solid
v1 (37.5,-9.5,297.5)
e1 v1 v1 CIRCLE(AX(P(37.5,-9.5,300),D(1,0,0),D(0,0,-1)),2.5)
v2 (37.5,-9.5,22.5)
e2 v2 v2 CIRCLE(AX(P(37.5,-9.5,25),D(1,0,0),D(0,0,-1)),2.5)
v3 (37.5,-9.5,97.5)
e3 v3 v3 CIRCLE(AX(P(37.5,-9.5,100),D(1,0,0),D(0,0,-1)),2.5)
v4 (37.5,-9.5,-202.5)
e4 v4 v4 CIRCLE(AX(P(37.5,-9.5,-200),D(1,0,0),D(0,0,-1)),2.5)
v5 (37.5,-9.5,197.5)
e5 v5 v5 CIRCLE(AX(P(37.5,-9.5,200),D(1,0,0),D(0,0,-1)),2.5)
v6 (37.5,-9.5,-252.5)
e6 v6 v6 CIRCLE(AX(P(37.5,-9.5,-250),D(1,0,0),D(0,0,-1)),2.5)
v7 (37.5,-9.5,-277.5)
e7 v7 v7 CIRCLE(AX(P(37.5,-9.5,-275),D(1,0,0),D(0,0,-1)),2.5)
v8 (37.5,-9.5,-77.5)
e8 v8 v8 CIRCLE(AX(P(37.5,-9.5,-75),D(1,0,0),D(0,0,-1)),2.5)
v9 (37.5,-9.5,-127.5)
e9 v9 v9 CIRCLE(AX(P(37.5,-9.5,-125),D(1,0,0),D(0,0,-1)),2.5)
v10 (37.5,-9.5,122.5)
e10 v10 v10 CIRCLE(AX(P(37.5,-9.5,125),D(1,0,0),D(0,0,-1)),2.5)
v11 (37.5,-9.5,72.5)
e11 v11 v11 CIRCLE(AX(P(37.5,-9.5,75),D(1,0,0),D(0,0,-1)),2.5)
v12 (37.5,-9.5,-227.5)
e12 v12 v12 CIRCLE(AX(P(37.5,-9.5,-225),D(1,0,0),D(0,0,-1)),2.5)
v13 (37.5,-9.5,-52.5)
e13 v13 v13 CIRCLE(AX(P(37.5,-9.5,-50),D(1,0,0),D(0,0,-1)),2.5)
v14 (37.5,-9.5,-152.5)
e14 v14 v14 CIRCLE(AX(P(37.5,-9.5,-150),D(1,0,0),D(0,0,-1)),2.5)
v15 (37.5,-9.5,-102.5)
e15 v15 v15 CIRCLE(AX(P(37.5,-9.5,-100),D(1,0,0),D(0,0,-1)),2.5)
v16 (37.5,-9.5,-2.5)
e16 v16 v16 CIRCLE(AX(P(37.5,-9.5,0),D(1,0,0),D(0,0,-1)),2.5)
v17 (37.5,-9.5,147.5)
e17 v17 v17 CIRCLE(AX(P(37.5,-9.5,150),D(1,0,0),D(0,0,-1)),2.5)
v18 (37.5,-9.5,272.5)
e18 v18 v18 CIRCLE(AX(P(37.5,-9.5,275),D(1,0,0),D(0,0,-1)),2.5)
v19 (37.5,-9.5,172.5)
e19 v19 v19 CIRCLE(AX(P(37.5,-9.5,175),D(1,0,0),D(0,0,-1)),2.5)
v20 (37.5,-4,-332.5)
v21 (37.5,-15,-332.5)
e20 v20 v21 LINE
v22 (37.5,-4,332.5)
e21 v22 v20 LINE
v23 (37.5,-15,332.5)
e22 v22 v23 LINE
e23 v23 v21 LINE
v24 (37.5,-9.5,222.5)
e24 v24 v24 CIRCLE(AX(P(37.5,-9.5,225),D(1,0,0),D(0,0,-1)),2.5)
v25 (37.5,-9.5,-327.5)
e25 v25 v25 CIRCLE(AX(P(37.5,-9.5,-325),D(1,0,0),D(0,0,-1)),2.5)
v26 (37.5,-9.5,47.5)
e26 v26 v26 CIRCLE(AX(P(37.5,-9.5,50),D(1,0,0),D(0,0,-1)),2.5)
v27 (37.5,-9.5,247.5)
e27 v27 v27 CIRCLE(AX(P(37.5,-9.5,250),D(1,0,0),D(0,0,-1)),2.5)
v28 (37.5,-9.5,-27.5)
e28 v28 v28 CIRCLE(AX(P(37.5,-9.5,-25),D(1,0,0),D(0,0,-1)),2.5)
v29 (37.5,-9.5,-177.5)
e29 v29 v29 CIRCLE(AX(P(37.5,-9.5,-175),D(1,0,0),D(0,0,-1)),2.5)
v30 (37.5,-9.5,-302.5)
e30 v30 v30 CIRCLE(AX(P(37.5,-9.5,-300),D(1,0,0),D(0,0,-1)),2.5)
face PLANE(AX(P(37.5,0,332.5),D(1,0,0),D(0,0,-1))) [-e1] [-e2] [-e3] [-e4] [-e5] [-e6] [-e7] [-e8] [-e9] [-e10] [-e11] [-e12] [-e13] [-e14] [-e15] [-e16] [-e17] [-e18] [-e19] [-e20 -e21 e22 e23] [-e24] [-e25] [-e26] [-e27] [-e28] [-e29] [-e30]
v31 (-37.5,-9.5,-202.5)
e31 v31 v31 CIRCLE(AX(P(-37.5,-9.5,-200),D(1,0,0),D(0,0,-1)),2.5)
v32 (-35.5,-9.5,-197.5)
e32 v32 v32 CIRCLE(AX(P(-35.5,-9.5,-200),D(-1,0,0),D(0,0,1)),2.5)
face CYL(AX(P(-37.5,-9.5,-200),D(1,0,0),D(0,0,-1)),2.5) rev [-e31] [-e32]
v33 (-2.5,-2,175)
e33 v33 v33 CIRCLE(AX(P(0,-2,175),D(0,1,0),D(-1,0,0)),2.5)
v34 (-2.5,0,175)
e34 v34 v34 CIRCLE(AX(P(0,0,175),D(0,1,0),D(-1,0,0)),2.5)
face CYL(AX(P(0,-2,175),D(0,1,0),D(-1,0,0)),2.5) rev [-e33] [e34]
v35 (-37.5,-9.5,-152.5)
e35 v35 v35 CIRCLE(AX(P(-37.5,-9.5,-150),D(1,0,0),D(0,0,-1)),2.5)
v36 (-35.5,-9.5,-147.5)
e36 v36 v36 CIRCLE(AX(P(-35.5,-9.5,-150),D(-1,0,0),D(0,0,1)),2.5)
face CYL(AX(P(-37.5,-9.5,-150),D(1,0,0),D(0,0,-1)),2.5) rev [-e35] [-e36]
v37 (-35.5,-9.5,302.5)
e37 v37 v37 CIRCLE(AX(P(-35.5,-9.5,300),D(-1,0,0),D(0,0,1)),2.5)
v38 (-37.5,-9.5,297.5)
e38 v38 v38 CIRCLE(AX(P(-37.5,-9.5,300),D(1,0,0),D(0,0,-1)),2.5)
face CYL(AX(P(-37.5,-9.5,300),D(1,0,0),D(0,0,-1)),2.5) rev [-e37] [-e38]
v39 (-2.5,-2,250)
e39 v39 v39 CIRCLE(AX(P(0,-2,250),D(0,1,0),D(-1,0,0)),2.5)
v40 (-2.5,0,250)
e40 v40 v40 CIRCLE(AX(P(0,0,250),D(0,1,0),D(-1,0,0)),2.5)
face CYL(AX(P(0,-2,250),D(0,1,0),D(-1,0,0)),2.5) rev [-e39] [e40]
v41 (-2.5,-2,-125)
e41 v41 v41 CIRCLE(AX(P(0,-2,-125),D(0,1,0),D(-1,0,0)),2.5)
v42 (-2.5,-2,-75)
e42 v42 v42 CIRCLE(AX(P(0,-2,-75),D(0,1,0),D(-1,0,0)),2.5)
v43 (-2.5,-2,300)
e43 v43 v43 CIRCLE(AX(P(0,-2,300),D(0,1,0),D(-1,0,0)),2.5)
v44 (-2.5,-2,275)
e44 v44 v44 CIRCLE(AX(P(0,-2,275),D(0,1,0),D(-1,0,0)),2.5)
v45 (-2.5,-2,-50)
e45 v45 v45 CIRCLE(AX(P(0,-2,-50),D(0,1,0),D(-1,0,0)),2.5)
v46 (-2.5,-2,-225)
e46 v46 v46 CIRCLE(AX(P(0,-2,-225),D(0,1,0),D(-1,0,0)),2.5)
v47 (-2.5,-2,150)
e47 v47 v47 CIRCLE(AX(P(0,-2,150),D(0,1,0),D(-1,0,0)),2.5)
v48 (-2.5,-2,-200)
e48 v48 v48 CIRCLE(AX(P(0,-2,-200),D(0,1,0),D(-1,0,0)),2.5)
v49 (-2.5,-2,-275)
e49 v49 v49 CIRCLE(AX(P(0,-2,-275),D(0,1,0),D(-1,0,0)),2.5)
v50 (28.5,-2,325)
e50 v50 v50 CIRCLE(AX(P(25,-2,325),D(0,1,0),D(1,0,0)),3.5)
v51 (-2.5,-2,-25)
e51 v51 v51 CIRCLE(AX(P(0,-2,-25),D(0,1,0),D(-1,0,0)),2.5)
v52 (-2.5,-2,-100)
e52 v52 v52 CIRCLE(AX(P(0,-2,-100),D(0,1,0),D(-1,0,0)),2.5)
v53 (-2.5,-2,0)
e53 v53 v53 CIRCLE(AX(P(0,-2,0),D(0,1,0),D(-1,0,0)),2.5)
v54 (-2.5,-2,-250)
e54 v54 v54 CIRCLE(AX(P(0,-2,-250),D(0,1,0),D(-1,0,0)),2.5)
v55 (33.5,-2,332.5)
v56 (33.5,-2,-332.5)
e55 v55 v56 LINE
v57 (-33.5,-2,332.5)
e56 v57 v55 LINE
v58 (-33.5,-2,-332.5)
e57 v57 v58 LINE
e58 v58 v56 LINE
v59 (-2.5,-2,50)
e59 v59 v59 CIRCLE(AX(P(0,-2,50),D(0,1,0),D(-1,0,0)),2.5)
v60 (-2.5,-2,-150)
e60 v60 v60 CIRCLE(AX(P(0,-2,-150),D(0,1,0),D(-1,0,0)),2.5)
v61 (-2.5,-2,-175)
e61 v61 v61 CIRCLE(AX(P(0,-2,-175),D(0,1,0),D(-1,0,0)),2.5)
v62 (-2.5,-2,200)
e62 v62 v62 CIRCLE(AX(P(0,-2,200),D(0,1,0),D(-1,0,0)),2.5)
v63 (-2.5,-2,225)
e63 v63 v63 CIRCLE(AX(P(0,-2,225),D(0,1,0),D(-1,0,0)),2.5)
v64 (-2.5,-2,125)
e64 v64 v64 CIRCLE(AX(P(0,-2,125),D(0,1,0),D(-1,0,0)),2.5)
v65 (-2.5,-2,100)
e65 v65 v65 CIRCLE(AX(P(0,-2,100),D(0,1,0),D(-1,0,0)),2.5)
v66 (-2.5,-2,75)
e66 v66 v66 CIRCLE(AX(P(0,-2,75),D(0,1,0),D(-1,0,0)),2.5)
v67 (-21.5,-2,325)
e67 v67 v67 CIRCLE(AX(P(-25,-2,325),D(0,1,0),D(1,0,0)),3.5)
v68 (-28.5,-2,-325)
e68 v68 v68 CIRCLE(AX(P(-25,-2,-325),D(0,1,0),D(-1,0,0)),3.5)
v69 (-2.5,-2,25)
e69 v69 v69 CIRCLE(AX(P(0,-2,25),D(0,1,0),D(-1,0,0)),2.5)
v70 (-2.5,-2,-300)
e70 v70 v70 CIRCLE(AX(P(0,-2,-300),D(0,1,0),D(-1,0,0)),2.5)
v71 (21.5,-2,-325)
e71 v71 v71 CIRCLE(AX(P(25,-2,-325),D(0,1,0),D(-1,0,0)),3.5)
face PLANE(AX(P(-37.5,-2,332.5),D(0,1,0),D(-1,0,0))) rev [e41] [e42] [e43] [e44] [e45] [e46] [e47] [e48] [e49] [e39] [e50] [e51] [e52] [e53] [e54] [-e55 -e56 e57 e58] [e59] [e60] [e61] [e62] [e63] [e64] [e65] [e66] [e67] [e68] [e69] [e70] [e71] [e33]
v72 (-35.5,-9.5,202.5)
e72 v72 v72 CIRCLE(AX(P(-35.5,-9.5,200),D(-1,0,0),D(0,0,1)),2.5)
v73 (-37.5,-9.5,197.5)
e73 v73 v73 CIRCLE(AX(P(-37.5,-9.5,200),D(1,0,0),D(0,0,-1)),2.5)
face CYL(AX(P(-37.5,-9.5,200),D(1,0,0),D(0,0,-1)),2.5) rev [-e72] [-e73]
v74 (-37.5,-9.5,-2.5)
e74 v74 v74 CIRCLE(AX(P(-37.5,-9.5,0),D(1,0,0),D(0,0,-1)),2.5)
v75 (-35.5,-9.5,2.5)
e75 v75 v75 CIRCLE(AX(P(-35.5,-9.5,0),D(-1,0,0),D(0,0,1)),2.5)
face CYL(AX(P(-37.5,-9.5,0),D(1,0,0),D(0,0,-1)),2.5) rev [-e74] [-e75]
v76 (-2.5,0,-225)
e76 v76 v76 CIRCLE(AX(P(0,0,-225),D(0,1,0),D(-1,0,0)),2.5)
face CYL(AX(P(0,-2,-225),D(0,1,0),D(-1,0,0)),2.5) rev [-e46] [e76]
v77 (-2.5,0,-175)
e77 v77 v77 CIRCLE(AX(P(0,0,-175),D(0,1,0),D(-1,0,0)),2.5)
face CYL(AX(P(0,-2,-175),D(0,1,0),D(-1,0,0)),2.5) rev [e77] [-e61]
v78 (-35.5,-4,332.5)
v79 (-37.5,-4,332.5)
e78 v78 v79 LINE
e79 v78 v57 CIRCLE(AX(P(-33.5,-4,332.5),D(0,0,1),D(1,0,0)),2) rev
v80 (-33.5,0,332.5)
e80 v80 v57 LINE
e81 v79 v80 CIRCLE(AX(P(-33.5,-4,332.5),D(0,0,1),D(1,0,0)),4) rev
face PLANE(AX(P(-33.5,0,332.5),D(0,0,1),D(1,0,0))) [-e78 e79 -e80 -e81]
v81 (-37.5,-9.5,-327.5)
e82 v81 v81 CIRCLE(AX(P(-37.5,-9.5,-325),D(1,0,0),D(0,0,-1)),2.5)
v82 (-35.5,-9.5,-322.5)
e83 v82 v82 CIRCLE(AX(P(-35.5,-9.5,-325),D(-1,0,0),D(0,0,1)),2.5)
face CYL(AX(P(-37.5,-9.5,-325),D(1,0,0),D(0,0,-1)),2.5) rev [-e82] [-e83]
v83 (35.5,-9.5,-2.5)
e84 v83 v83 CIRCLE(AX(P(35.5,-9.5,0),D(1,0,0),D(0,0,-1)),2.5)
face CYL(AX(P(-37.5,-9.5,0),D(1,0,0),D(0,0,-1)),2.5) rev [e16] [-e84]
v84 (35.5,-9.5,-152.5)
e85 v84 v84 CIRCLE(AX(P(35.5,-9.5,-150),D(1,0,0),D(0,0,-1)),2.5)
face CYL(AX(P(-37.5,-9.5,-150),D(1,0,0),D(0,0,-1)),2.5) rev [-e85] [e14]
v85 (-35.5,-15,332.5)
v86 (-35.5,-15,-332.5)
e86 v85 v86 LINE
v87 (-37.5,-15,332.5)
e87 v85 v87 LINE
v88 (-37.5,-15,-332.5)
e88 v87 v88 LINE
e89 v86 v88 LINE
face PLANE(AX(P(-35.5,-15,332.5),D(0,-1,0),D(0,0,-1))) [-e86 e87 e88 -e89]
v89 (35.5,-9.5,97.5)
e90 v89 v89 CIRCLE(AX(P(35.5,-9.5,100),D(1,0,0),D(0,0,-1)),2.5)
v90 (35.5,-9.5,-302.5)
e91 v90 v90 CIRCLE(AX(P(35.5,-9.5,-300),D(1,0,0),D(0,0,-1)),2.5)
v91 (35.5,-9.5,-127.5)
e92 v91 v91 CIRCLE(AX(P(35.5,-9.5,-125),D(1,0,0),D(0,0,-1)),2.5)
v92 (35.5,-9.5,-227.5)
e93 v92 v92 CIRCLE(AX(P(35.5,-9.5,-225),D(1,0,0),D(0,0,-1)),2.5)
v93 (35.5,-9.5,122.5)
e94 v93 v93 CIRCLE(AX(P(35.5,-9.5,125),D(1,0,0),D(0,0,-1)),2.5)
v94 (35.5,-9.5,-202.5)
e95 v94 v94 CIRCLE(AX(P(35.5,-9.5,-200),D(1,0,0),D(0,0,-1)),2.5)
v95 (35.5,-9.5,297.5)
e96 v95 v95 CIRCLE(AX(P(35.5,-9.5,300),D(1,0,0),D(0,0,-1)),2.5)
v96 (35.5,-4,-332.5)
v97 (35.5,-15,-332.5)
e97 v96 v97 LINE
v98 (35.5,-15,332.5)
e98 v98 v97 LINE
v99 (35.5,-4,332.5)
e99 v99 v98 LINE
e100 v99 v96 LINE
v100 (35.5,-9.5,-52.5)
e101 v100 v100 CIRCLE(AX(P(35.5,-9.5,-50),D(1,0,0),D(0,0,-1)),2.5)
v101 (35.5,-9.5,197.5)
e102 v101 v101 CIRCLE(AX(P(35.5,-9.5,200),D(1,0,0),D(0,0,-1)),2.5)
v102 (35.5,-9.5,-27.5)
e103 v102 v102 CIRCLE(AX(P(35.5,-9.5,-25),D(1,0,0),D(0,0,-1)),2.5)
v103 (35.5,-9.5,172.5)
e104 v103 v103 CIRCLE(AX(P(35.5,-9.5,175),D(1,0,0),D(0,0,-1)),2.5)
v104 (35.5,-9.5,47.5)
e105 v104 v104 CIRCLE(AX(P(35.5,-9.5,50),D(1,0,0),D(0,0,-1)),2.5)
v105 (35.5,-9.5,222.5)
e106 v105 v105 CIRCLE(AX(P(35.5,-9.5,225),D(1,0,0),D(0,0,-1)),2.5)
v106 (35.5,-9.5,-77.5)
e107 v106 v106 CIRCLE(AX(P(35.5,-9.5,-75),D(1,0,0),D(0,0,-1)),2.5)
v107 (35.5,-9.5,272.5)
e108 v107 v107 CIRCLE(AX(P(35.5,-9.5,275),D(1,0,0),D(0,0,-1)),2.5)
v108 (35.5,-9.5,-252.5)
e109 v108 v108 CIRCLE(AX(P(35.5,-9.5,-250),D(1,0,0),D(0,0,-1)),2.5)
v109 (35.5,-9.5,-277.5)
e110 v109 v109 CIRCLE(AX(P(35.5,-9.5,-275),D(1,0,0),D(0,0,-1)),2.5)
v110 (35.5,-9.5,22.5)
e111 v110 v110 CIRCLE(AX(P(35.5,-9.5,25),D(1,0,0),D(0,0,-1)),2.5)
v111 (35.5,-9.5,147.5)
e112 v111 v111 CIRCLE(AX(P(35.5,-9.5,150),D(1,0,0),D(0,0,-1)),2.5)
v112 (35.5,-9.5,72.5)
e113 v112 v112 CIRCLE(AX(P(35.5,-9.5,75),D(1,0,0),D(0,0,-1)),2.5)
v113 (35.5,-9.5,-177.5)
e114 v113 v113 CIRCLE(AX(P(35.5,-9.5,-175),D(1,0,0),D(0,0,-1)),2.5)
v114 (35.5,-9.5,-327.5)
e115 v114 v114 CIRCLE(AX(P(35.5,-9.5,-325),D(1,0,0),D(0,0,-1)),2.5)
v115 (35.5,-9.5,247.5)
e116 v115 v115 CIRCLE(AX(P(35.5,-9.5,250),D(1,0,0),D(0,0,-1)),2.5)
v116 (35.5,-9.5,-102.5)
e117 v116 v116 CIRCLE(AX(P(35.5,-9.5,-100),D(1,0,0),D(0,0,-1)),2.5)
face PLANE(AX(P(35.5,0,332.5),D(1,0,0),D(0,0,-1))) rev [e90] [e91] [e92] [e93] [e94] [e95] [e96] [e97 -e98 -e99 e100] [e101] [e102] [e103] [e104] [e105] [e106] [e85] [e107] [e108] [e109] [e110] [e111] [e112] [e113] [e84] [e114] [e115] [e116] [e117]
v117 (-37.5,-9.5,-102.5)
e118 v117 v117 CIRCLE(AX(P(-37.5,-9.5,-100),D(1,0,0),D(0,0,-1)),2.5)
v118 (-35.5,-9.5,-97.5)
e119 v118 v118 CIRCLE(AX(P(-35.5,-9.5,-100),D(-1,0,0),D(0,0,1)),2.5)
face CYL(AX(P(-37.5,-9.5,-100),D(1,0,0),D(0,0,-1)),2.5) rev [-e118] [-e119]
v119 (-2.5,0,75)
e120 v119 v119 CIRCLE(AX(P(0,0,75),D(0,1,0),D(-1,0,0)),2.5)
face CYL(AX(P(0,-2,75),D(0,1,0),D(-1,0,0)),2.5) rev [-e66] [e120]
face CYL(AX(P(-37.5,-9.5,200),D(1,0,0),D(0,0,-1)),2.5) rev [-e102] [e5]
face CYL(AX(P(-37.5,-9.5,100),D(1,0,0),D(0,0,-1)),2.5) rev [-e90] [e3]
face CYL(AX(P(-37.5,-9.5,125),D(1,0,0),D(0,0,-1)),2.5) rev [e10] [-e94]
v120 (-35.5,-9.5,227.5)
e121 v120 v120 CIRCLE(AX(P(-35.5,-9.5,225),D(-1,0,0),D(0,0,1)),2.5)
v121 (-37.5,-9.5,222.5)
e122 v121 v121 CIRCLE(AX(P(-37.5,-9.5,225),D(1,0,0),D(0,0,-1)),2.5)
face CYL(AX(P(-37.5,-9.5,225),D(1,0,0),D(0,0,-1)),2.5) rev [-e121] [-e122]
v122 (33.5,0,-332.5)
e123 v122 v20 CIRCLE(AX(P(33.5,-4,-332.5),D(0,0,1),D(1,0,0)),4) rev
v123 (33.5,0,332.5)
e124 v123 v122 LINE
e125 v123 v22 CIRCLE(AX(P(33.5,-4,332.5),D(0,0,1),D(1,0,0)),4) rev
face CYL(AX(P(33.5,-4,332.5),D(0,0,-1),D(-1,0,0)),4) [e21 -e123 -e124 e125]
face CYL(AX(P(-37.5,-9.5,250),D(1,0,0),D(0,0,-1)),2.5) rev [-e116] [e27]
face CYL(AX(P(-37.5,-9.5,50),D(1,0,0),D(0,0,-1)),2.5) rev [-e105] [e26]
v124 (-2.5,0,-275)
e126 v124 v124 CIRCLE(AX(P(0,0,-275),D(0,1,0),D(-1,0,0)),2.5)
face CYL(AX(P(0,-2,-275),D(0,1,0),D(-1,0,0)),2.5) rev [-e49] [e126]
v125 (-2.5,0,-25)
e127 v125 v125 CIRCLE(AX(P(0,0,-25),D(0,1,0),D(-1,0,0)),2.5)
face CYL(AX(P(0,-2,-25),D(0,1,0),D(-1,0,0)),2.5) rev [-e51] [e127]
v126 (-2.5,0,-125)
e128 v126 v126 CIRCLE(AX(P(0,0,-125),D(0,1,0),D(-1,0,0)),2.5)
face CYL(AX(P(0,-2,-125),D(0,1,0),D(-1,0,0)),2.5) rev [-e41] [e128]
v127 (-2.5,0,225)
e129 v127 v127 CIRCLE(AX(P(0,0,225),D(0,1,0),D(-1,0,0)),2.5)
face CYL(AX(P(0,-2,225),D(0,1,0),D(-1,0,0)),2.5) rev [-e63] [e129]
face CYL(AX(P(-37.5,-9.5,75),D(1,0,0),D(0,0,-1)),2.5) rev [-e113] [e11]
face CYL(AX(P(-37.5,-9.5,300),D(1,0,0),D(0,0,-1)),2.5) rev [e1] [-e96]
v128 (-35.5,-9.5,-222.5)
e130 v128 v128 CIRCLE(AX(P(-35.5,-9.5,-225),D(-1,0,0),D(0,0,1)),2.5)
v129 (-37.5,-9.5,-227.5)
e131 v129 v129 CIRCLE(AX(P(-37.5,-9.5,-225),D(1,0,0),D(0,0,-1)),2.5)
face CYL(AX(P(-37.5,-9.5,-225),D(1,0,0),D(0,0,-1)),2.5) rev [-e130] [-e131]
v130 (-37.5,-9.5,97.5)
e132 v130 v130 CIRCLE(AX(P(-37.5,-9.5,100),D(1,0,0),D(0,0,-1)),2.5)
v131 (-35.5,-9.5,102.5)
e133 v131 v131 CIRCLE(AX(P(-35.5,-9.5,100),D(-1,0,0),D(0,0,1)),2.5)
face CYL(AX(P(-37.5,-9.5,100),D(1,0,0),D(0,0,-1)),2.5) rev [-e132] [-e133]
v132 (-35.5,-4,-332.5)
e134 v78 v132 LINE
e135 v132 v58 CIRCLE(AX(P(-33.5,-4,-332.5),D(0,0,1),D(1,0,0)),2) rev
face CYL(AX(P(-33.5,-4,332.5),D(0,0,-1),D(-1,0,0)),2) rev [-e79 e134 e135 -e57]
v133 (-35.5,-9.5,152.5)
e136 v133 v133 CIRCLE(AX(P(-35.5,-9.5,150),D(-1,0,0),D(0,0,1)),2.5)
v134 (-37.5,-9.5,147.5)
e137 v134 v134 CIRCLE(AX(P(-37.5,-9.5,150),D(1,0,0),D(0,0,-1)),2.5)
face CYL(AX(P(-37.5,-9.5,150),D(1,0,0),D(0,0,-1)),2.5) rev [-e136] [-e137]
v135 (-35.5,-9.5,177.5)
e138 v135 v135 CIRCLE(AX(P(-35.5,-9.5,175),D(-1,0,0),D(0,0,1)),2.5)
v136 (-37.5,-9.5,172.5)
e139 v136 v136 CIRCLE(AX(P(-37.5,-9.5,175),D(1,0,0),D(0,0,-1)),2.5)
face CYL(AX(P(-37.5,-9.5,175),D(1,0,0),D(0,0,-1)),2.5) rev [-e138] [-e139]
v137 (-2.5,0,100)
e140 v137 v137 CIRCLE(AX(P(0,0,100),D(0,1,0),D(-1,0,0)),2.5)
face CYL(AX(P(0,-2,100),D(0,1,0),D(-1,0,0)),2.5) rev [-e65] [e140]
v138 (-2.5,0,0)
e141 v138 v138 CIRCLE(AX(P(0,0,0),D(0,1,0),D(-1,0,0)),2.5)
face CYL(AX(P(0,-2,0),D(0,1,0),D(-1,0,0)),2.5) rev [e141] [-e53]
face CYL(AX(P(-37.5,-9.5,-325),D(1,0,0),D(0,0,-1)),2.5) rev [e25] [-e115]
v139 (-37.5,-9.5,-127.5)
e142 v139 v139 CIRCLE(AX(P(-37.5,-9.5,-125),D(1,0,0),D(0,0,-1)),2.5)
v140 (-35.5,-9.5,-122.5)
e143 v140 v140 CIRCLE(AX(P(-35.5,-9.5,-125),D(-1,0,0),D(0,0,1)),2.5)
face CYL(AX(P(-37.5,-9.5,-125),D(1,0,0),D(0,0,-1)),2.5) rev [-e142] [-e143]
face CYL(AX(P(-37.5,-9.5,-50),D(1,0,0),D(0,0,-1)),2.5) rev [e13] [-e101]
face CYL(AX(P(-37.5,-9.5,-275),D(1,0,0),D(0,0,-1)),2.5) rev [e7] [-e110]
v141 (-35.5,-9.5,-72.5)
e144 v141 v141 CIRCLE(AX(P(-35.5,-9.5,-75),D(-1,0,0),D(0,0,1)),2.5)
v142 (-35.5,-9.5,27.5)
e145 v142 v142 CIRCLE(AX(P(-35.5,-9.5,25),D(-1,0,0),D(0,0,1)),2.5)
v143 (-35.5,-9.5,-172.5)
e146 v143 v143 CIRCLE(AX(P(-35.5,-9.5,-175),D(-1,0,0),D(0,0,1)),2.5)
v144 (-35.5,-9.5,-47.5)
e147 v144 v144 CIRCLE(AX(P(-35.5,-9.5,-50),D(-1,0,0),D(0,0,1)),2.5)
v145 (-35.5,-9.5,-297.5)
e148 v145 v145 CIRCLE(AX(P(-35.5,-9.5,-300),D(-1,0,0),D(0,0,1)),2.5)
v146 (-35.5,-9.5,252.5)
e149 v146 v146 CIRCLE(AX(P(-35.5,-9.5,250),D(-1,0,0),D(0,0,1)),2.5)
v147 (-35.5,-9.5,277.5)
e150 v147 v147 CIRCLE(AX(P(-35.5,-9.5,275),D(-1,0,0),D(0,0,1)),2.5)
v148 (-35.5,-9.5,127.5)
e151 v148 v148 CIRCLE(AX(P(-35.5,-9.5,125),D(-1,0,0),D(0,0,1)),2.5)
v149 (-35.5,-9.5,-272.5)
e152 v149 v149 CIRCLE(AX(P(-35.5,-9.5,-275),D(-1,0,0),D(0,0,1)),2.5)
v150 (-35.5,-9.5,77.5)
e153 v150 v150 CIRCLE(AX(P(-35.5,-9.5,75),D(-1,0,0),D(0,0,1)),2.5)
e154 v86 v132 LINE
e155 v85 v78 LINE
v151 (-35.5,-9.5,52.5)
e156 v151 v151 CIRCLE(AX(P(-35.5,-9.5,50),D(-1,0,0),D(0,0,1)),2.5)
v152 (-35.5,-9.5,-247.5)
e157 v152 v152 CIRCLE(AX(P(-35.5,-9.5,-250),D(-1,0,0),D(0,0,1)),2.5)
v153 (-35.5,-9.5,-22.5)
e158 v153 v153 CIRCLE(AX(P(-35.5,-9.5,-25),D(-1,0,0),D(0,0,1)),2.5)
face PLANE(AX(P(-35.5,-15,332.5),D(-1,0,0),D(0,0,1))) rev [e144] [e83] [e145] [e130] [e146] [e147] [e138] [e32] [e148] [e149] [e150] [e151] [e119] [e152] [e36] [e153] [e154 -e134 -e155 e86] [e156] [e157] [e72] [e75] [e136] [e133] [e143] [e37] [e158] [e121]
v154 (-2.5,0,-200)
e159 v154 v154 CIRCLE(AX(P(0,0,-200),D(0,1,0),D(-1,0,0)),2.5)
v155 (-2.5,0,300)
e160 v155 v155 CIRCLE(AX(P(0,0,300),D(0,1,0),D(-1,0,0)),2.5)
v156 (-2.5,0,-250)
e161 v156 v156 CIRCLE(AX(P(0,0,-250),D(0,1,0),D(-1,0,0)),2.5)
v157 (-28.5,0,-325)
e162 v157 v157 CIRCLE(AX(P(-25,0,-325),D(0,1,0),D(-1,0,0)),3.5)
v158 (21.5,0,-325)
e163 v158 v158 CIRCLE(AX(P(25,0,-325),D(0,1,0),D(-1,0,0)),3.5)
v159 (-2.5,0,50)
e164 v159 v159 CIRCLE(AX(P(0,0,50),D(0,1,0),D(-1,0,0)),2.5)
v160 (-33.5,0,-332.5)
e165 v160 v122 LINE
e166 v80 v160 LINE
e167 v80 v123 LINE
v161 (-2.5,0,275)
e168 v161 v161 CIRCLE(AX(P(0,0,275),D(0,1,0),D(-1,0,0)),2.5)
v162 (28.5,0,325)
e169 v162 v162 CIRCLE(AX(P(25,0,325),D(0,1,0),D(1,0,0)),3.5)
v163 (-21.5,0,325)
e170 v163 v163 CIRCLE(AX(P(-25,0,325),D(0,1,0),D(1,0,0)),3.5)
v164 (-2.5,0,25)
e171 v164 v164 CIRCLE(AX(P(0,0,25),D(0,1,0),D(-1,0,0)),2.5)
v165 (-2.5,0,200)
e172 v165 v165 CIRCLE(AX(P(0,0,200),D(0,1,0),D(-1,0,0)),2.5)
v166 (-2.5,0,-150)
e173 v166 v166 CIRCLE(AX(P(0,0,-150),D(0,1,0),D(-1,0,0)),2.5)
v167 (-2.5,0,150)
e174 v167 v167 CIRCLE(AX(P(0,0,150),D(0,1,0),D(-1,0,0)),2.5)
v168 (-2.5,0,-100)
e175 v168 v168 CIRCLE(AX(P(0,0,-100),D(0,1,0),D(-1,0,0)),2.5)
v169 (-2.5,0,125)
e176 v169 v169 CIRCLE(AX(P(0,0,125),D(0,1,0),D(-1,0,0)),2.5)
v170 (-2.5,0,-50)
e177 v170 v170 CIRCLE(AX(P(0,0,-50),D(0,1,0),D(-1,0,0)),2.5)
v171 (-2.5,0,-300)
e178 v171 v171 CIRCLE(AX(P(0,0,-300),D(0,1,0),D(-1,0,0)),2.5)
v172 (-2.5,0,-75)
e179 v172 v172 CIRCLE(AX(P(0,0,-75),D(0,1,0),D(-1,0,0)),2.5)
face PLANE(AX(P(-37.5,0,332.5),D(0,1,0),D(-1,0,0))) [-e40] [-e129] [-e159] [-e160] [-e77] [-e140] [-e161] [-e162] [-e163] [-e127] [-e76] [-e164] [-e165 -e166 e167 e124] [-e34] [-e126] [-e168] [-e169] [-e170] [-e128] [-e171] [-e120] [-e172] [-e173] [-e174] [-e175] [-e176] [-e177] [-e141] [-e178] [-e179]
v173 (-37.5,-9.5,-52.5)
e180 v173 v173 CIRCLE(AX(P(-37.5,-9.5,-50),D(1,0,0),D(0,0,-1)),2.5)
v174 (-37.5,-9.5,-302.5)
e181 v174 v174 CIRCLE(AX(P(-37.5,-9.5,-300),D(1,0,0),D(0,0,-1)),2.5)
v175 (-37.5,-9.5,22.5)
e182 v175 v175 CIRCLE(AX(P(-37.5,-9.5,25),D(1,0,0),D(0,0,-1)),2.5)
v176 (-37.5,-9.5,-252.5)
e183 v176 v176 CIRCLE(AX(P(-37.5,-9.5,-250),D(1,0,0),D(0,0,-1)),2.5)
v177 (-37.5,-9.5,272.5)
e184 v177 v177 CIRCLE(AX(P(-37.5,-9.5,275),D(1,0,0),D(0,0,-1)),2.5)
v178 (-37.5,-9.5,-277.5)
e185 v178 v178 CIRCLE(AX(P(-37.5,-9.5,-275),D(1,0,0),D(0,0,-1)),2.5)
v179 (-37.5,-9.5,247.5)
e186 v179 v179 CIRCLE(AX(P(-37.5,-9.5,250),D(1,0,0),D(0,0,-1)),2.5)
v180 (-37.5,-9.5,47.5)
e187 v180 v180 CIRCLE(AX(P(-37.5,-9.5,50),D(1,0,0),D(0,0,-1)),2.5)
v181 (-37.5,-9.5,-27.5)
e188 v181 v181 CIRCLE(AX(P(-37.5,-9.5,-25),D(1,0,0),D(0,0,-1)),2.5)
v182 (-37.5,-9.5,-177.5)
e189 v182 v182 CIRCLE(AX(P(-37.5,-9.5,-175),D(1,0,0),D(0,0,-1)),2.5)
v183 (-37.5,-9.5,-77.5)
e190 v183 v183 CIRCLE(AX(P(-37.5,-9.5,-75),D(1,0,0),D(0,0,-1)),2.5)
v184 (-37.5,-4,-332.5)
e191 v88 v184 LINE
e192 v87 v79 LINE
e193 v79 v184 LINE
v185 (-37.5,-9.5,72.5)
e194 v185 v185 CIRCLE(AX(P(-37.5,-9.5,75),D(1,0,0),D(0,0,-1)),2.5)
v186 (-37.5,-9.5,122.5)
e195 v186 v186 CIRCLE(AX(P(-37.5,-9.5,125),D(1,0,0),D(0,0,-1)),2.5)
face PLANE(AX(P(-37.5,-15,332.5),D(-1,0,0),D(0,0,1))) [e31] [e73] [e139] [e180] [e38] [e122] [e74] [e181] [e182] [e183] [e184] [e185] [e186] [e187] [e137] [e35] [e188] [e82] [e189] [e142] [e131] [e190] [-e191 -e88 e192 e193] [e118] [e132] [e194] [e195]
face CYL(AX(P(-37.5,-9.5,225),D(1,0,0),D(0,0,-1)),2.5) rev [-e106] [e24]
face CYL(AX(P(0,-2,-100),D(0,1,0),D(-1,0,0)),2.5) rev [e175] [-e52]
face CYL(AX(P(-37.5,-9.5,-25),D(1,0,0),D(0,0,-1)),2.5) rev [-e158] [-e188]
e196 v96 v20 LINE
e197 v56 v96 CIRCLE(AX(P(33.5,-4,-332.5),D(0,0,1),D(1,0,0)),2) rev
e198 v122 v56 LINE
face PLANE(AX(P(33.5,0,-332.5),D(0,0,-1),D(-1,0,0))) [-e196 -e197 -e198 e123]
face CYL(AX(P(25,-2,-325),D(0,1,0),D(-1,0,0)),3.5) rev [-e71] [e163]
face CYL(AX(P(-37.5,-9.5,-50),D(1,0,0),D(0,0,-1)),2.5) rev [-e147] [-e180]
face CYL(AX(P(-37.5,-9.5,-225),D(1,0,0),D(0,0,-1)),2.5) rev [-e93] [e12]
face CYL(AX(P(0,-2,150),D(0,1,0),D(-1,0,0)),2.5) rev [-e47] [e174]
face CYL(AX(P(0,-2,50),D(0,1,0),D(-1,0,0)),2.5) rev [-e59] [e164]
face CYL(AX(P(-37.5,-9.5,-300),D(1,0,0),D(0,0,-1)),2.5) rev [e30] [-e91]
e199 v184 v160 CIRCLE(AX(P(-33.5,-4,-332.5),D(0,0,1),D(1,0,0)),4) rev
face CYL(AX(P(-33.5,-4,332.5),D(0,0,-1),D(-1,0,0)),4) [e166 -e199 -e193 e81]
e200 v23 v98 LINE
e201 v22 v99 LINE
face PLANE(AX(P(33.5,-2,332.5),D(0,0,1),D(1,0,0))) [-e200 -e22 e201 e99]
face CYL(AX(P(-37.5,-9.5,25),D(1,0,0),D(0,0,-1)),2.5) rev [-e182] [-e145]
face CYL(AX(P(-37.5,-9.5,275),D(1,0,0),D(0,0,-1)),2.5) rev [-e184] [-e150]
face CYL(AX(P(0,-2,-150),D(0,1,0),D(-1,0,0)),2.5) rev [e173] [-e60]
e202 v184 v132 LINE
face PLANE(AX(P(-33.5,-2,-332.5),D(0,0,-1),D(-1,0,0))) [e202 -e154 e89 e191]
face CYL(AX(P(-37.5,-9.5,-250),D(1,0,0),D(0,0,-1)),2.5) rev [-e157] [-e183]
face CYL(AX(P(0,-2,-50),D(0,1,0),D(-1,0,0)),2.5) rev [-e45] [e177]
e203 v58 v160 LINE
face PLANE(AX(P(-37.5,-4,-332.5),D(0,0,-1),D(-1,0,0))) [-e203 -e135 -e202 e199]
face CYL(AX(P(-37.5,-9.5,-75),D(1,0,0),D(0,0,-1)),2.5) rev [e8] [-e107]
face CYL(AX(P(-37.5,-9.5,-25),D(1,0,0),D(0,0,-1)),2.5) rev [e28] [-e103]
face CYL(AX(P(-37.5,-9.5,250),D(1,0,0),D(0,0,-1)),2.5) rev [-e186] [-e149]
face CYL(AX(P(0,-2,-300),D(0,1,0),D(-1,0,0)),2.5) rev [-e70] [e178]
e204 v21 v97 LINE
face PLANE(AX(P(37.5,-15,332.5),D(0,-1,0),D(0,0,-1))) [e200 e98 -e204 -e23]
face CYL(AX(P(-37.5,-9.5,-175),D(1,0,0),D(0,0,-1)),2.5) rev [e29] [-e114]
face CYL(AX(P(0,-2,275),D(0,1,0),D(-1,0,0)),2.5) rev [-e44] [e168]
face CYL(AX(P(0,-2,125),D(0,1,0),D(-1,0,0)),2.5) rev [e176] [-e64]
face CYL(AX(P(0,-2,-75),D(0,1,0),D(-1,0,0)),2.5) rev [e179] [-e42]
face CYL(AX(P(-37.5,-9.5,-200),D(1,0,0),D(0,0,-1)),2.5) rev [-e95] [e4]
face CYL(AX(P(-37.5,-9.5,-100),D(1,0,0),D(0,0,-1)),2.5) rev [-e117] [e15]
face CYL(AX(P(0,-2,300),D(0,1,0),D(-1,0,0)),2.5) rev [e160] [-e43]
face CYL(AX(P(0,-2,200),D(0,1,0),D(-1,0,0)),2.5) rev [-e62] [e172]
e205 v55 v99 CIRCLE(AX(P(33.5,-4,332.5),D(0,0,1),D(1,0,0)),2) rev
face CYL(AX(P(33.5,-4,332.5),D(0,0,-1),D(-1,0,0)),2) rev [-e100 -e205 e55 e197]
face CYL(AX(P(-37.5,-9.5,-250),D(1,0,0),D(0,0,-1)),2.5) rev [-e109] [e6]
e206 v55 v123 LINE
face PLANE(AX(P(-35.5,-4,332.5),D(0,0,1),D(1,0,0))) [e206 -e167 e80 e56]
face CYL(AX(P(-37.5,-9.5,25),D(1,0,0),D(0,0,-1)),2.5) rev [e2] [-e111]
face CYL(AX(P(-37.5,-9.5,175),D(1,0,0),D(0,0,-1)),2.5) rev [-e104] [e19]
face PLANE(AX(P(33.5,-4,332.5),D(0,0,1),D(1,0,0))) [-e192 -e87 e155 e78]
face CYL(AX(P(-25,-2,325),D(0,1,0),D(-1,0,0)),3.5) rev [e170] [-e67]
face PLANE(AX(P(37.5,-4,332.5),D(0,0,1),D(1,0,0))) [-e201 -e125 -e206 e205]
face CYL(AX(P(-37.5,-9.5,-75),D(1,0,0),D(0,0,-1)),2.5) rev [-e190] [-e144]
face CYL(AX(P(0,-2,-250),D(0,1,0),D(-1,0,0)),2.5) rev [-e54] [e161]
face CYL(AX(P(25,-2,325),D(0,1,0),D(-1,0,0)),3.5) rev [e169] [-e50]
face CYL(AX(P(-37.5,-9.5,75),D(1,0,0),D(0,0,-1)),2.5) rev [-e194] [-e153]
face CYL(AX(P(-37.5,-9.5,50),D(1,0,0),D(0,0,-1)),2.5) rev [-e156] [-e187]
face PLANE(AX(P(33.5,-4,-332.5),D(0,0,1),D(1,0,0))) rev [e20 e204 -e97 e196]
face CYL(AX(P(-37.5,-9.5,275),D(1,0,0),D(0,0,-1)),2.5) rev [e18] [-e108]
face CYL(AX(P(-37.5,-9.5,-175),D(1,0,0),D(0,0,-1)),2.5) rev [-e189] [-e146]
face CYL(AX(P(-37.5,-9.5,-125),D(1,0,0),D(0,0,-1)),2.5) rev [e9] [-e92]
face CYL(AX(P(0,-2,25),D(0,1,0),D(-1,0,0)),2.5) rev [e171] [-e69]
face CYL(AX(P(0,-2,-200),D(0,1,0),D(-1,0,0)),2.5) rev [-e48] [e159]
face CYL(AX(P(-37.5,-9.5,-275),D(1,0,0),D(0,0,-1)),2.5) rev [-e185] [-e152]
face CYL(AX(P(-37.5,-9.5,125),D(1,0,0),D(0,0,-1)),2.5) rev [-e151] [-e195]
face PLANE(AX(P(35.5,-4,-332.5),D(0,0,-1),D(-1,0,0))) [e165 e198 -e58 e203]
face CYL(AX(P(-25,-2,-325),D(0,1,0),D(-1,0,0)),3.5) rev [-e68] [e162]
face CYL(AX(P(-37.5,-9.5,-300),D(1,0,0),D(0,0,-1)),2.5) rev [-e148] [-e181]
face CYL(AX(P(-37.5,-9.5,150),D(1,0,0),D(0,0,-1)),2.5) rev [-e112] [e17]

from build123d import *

# Parameters (mm, degrees)
SM_BASE_FLANGE_1_DEPTH = 332.5
SKETCH_6_R             = 2.5
CUT_EXTRUDE_1_DEPTH    = 342.183601599
SKETCH_7_R             = 2.5
CUT_EXTRUDE_2_DEPTH    = 10
SKETCH_8_R             = 3.5
CUT_EXTRUDE_3_DEPTH    = 10


# Sheet-metal steps are written as plain solids
with BuildPart() as part:
    # Sketch 1 → Базовая кромка1 (new, symmetric)
    with BuildSketch(Plane.XY):
        with BuildLine():
            Line((-37.5, -15), (-37.5, -4))
            ThreePointArc((-37.5, -4), (-36.328427125, -1.171572875), (-33.5, 0))
            Line((-33.5, 0), (33.5, 0))
            ThreePointArc((33.5, 0), (36.328427125, -1.171572875), (37.5, -4))
            Line((37.5, -4), (37.5, -15))
            Line((37.5, -15), (35.5, -15))
            Line((35.5, -15), (35.5, -4))
            ThreePointArc((35.5, -4), (34.914213562, -2.585786438), (33.5, -2))
            Line((33.5, -2), (-33.5, -2))
            ThreePointArc((-33.5, -2), (-34.914213562, -2.585786438), (-35.5, -4))
            Line((-35.5, -4), (-35.5, -15))
            Line((-35.5, -15), (-37.5, -15))
        make_face()
    extrude(amount=SM_BASE_FLANGE_1_DEPTH, both=True)

    # Эскиз6 → Вырез-Вытянуть1 (cut, through all)
    with BuildSketch(Plane(origin=(37.5, 0, 0), x_dir=(0, 0, -1), z_dir=(1, 0, 0))):
        with Locations((-300, -9.5)):
            Circle(SKETCH_6_R)
        with Locations((-275, -9.5)):
            Circle(SKETCH_6_R)
        with Locations((-250, -9.5)):
            Circle(SKETCH_6_R)
        with Locations((-225, -9.5)):
            Circle(SKETCH_6_R)
        with Locations((-200, -9.5)):
            Circle(SKETCH_6_R)
        with Locations((-175, -9.5)):
            Circle(SKETCH_6_R)
        with Locations((-150, -9.5)):
            Circle(SKETCH_6_R)
        with Locations((-125, -9.5)):
            Circle(SKETCH_6_R)
        with Locations((-100, -9.5)):
            Circle(SKETCH_6_R)
        with Locations((-75, -9.5)):
            Circle(SKETCH_6_R)
        with Locations((-50, -9.5)):
            Circle(SKETCH_6_R)
        with Locations((-25, -9.5)):
            Circle(SKETCH_6_R)
        with Locations((0, -9.5)):
            Circle(SKETCH_6_R)
        with Locations((25, -9.5)):
            Circle(SKETCH_6_R)
        with Locations((50, -9.5)):
            Circle(SKETCH_6_R)
        with Locations((75, -9.5)):
            Circle(SKETCH_6_R)
        with Locations((100, -9.5)):
            Circle(SKETCH_6_R)
        with Locations((125, -9.5)):
            Circle(SKETCH_6_R)
        with Locations((150, -9.5)):
            Circle(SKETCH_6_R)
        with Locations((175, -9.5)):
            Circle(SKETCH_6_R)
        with Locations((200, -9.5)):
            Circle(SKETCH_6_R)
        with Locations((225, -9.5)):
            Circle(SKETCH_6_R)
        with Locations((250, -9.5)):
            Circle(SKETCH_6_R)
        with Locations((275, -9.5)):
            Circle(SKETCH_6_R)
        with Locations((300, -9.5)):
            Circle(SKETCH_6_R)
        with Locations((325, -9.5)):
            Circle(SKETCH_6_R)
        with Locations((350, -9.5)):
            Circle(SKETCH_6_R)
        with Locations((375, -9.5)):
            Circle(SKETCH_6_R)
        with Locations((400, -9.5)):
            Circle(SKETCH_6_R)
        with Locations((425, -9.5)):
            Circle(SKETCH_6_R)
        with Locations((450, -9.5)):
            Circle(SKETCH_6_R)
        with Locations((475, -9.5)):
            Circle(SKETCH_6_R)
        with Locations((500, -9.5)):
            Circle(SKETCH_6_R)
        with Locations((525, -9.5)):
            Circle(SKETCH_6_R)
        with Locations((550, -9.5)):
            Circle(SKETCH_6_R)
        with Locations((575, -9.5)):
            Circle(SKETCH_6_R)
    extrude(amount=-CUT_EXTRUDE_1_DEPTH, mode=Mode.SUBTRACT)

    # Эскиз7 → Вырез-Вытянуть2 (cut)
    with BuildSketch(Plane(origin=(0, 0, 0), x_dir=(1, 0, 0), z_dir=(0, 1, 0))):
        with Locations(Location((0, 300, 0), (0, 0, 180))):
            Circle(SKETCH_7_R)
        with Locations(Location((0, 275, 0), (0, 0, 180))):
            Circle(SKETCH_7_R)
        with Locations(Location((0, 250, 0), (0, 0, 180))):
            Circle(SKETCH_7_R)
        with Locations(Location((0, 225, 0), (0, 0, 180))):
            Circle(SKETCH_7_R)
        with Locations(Location((0, 200, 0), (0, 0, 180))):
            Circle(SKETCH_7_R)
        with Locations(Location((0, 175, 0), (0, 0, 180))):
            Circle(SKETCH_7_R)
        with Locations(Location((0, 150, 0), (0, 0, 180))):
            Circle(SKETCH_7_R)
        with Locations(Location((0, 125, 0), (0, 0, 180))):
            Circle(SKETCH_7_R)
        with Locations(Location((0, 100, 0), (0, 0, 180))):
            Circle(SKETCH_7_R)
        with Locations(Location((0, 75, 0), (0, 0, 180))):
            Circle(SKETCH_7_R)
        with Locations(Location((0, 50, 0), (0, 0, 180))):
            Circle(SKETCH_7_R)
        with Locations(Location((0, 25, 0), (0, 0, 180))):
            Circle(SKETCH_7_R)
        with Locations(Location((0, 0, 0), (0, 0, 180))):
            Circle(SKETCH_7_R)
        with Locations(Location((0, -25, 0), (0, 0, 180))):
            Circle(SKETCH_7_R)
        with Locations(Location((0, -50, 0), (0, 0, 180))):
            Circle(SKETCH_7_R)
        with Locations(Location((0, -75, 0), (0, 0, 180))):
            Circle(SKETCH_7_R)
        with Locations(Location((0, -100, 0), (0, 0, 180))):
            Circle(SKETCH_7_R)
        with Locations(Location((0, -125, 0), (0, 0, 180))):
            Circle(SKETCH_7_R)
        with Locations(Location((0, -150, 0), (0, 0, 180))):
            Circle(SKETCH_7_R)
        with Locations(Location((0, -175, 0), (0, 0, 180))):
            Circle(SKETCH_7_R)
        with Locations(Location((0, -200, 0), (0, 0, 180))):
            Circle(SKETCH_7_R)
        with Locations(Location((0, -225, 0), (0, 0, 180))):
            Circle(SKETCH_7_R)
        with Locations(Location((0, -250, 0), (0, 0, 180))):
            Circle(SKETCH_7_R)
        with Locations(Location((0, -275, 0), (0, 0, 180))):
            Circle(SKETCH_7_R)
        with Locations(Location((0, -300, 0), (0, 0, 180))):
            Circle(SKETCH_7_R)
    extrude(amount=-CUT_EXTRUDE_2_DEPTH, mode=Mode.SUBTRACT)

    # Эскиз8 → Вырез-Вытянуть3 (cut)
    with BuildSketch(Plane(origin=(0, 0, 0), x_dir=(1, 0, 0), z_dir=(0, 1, 0))):
        with Locations(Location((25, 325, 0), (0, 0, 180))):
            Circle(SKETCH_8_R)
        with Locations(Location((-25, 325, 0), (0, 0, 180))):
            Circle(SKETCH_8_R)
        with Locations((-25, -325)):
            Circle(SKETCH_8_R)
        with Locations((25, -325)):
            Circle(SKETCH_8_R)
    extrude(amount=-CUT_EXTRUDE_3_DEPTH, mode=Mode.SUBTRACT)


solid = part.part
